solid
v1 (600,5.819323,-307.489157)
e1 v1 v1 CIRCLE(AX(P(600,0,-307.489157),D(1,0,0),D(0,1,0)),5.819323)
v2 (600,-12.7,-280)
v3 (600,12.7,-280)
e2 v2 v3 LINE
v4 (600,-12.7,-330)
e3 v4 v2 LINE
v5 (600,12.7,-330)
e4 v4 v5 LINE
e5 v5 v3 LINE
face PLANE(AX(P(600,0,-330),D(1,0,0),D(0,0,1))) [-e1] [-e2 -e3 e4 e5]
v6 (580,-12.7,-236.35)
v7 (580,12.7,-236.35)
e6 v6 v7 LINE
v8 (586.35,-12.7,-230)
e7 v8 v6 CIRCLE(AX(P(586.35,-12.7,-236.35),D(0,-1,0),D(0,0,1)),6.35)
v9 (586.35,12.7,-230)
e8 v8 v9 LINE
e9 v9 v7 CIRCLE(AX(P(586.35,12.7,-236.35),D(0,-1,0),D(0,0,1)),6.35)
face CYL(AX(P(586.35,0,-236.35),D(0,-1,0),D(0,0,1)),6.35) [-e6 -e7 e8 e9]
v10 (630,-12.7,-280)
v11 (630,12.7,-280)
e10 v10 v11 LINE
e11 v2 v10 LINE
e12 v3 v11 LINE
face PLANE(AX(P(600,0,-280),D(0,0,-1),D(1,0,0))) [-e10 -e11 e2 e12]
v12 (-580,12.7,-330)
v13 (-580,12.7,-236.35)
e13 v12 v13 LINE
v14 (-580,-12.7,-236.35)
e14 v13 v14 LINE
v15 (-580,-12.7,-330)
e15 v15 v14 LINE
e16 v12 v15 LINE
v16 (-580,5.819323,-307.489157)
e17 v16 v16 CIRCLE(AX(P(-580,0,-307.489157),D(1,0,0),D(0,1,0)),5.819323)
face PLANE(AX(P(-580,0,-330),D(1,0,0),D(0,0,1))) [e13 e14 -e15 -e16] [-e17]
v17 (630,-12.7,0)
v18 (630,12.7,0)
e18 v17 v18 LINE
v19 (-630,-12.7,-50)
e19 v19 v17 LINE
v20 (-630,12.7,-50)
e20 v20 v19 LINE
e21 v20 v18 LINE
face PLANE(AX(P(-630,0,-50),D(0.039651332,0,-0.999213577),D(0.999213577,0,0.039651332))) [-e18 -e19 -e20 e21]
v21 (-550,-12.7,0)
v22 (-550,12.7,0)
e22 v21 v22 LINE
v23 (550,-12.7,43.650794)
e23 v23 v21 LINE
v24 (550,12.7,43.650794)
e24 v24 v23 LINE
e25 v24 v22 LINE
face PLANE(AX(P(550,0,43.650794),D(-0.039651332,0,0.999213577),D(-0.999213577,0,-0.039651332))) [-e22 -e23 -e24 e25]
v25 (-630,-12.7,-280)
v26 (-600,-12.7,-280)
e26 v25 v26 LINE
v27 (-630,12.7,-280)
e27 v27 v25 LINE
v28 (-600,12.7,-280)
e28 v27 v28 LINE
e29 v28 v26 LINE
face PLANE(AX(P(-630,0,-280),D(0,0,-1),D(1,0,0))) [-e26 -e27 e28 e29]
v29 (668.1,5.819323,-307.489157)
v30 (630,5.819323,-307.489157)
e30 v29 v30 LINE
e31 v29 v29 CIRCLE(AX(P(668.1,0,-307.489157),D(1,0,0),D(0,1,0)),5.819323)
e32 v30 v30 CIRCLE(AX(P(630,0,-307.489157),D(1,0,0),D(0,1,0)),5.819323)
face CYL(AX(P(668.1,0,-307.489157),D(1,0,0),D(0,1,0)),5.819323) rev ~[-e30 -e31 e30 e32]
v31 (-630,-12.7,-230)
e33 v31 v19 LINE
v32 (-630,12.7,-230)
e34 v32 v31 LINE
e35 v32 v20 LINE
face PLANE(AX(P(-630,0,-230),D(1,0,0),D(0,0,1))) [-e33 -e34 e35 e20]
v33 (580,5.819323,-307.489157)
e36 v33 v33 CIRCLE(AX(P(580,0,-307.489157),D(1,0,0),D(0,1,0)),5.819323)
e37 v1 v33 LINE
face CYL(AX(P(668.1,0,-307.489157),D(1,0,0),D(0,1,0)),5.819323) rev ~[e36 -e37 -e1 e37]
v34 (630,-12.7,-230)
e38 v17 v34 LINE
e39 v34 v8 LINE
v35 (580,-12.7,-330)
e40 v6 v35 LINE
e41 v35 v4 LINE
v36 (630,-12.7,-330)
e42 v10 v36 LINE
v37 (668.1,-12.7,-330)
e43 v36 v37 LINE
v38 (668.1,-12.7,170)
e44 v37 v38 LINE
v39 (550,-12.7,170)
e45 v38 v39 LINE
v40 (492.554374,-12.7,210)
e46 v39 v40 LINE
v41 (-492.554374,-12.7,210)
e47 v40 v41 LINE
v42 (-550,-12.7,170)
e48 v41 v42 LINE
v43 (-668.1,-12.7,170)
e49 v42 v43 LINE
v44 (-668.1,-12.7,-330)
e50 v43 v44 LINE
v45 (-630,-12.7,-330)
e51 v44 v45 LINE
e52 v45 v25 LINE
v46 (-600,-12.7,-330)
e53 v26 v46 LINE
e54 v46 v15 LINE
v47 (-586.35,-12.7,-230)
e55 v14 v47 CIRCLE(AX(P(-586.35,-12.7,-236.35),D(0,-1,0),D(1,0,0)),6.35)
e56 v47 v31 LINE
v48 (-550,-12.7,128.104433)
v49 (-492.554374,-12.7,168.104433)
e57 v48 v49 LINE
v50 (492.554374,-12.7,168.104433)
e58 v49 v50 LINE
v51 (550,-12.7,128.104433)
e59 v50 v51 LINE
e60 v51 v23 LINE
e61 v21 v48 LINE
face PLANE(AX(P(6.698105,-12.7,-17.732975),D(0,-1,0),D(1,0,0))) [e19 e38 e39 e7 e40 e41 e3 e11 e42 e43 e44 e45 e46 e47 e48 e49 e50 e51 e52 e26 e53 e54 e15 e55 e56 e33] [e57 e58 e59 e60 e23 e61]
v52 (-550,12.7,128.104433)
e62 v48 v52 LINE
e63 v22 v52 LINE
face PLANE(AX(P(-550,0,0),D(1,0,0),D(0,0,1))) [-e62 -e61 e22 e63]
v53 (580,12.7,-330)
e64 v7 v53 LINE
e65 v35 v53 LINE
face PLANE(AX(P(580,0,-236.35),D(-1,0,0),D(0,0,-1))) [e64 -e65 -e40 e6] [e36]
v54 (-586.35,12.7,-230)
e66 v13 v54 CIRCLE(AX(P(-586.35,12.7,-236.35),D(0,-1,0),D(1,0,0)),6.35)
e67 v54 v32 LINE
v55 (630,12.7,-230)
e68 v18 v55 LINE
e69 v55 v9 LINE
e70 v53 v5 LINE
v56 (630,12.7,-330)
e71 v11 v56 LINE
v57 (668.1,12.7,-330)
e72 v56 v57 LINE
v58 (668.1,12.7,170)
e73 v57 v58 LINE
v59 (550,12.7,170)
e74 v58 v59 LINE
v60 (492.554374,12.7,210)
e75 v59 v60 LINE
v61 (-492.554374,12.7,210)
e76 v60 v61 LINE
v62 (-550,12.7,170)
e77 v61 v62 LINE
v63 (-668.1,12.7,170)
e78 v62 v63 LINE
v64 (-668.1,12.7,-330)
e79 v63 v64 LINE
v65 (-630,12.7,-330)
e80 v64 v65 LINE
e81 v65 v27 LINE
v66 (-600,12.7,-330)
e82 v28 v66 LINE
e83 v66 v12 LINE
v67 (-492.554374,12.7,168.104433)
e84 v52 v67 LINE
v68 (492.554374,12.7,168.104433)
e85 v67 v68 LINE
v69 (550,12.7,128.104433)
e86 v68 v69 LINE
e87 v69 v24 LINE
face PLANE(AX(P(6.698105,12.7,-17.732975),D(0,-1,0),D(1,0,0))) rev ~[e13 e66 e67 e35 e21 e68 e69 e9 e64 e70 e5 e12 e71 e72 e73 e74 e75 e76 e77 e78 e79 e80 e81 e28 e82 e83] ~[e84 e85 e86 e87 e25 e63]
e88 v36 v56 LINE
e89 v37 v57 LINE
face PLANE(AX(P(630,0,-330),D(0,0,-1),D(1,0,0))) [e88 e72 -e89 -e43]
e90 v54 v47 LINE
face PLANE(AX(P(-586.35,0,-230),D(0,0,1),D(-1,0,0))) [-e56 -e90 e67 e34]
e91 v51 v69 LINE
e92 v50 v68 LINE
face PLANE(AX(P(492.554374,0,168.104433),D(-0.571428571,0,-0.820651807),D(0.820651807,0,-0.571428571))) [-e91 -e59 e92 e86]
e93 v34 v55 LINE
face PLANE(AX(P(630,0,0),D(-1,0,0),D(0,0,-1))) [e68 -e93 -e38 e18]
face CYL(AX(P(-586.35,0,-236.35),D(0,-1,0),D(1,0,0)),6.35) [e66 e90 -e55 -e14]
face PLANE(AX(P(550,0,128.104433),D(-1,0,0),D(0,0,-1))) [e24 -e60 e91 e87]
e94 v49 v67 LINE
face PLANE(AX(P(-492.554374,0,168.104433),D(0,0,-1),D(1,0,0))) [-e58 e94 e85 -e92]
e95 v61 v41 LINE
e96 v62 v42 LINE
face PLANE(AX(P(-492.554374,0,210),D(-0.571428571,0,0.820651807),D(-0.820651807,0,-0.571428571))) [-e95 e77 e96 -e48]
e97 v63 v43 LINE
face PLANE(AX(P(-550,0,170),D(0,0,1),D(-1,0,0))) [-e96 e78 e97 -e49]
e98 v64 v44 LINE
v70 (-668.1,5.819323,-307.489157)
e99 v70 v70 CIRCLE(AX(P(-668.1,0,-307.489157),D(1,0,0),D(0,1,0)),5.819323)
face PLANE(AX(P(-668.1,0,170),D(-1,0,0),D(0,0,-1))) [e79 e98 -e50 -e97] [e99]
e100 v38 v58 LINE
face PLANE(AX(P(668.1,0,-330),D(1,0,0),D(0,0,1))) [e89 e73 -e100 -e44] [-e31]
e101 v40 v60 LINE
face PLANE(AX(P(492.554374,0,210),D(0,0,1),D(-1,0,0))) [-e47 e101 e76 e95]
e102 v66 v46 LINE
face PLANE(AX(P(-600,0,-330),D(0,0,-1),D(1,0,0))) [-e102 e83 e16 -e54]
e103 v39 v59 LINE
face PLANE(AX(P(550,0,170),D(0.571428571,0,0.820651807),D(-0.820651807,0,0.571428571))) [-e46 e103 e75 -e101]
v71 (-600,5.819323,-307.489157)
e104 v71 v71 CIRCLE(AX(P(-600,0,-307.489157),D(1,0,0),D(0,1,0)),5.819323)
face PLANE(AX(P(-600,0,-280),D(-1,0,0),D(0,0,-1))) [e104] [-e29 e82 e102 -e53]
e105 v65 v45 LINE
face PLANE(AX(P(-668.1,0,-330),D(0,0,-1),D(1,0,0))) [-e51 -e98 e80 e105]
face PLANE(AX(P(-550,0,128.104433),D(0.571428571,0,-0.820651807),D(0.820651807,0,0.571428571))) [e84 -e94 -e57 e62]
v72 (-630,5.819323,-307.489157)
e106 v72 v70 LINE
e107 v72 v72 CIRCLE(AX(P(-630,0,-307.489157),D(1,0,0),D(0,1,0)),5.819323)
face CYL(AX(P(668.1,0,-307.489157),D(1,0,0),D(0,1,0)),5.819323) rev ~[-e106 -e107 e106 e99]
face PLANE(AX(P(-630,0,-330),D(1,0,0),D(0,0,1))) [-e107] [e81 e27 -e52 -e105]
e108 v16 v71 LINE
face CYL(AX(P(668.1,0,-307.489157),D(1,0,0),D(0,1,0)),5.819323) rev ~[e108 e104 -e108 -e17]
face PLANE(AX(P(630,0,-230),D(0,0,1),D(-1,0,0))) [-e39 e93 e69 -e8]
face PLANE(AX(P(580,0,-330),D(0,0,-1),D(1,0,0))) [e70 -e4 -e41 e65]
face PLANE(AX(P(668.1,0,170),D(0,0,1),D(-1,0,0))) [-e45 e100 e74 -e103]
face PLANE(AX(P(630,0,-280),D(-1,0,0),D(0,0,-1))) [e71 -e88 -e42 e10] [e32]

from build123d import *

# Parameters (mm, degrees)
F1_DEPTH = 12.7
F2_R     = 5.8193233161
F3_DEPTH = 1800


# Not quite as in the source:
# - a feature names something its author has since deleted; it is built from what else it names


with BuildPart() as f1:
    # F0 (on Front) → F1 (new body, symmetric)
    with BuildSketch(Plane.XZ):
        with BuildLine():
            Line((492.5543735346, 210), (0, 210))
            Line((0, 210), (-492.5543735346, 210))
            Line((-492.5543735346, 210), (-550, 170))
            Line((-550, 170), (-630, 170))
            Line((-630, 170), (-668.1, 170))
            Line((-668.1, 170), (-668.1, -230))
            Line((-668.1, -230), (-668.1, -330))
            Line((-668.1, -330), (-630, -330))
            Line((-630, -330), (-630, -280))
            Line((-630, -280), (-600, -280))
            Line((-600, -280), (-600, -330))
            Line((-600, -330), (-580, -330))
            Line((-580, -330), (-580, -236.35))
            ThreePointArc((-580, -236.35), (-581.8598719395, -231.8598719395), (-586.35, -230))
            Line((-586.35, -230), (-630, -230))
            Line((-630, -230), (-630, -50))
            Line((-630, -50), (630, 0))
            Line((630, 0), (630, -50))
            Line((630, -50), (630, -230))
            Line((630, -230), (586.35, -230))
            ThreePointArc((586.35, -230), (581.8598719395, -231.8598719395), (580, -236.35))
            Line((580, -236.35), (580, -330))
            Line((580, -330), (600, -330))
            Line((600, -330), (600, -280))
            Line((600, -280), (630, -280))
            Line((630, -280), (630, -330))
            Line((630, -330), (668.1, -330))
            Line((668.1, -330), (668.1, -230))
            Line((668.1, -230), (668.1, 170))
            Line((668.1, 170), (630, 170))
            Line((630, 170), (550, 170))
            Line((550, 170), (492.5543735346, 210))
        make_face()
        Polygon((550, 43.6507936508), (-550, 0), (-550, 128.1044334173), (-492.5543735346, 168.1044334173), (492.5543735346, 168.1044334173), (550, 128.1044334173), align=None, mode=Mode.SUBTRACT)
    extrude(amount=F1_DEPTH, both=True)

    # F2 (on face) → F3 (cut)
    with BuildSketch(Plane.YZ.offset(668.1)):
        with Locations((0, -307.489156723)):
            Circle(F2_R)
    extrude(amount=-F3_DEPTH, mode=Mode.SUBTRACT)


solid = f1.part
